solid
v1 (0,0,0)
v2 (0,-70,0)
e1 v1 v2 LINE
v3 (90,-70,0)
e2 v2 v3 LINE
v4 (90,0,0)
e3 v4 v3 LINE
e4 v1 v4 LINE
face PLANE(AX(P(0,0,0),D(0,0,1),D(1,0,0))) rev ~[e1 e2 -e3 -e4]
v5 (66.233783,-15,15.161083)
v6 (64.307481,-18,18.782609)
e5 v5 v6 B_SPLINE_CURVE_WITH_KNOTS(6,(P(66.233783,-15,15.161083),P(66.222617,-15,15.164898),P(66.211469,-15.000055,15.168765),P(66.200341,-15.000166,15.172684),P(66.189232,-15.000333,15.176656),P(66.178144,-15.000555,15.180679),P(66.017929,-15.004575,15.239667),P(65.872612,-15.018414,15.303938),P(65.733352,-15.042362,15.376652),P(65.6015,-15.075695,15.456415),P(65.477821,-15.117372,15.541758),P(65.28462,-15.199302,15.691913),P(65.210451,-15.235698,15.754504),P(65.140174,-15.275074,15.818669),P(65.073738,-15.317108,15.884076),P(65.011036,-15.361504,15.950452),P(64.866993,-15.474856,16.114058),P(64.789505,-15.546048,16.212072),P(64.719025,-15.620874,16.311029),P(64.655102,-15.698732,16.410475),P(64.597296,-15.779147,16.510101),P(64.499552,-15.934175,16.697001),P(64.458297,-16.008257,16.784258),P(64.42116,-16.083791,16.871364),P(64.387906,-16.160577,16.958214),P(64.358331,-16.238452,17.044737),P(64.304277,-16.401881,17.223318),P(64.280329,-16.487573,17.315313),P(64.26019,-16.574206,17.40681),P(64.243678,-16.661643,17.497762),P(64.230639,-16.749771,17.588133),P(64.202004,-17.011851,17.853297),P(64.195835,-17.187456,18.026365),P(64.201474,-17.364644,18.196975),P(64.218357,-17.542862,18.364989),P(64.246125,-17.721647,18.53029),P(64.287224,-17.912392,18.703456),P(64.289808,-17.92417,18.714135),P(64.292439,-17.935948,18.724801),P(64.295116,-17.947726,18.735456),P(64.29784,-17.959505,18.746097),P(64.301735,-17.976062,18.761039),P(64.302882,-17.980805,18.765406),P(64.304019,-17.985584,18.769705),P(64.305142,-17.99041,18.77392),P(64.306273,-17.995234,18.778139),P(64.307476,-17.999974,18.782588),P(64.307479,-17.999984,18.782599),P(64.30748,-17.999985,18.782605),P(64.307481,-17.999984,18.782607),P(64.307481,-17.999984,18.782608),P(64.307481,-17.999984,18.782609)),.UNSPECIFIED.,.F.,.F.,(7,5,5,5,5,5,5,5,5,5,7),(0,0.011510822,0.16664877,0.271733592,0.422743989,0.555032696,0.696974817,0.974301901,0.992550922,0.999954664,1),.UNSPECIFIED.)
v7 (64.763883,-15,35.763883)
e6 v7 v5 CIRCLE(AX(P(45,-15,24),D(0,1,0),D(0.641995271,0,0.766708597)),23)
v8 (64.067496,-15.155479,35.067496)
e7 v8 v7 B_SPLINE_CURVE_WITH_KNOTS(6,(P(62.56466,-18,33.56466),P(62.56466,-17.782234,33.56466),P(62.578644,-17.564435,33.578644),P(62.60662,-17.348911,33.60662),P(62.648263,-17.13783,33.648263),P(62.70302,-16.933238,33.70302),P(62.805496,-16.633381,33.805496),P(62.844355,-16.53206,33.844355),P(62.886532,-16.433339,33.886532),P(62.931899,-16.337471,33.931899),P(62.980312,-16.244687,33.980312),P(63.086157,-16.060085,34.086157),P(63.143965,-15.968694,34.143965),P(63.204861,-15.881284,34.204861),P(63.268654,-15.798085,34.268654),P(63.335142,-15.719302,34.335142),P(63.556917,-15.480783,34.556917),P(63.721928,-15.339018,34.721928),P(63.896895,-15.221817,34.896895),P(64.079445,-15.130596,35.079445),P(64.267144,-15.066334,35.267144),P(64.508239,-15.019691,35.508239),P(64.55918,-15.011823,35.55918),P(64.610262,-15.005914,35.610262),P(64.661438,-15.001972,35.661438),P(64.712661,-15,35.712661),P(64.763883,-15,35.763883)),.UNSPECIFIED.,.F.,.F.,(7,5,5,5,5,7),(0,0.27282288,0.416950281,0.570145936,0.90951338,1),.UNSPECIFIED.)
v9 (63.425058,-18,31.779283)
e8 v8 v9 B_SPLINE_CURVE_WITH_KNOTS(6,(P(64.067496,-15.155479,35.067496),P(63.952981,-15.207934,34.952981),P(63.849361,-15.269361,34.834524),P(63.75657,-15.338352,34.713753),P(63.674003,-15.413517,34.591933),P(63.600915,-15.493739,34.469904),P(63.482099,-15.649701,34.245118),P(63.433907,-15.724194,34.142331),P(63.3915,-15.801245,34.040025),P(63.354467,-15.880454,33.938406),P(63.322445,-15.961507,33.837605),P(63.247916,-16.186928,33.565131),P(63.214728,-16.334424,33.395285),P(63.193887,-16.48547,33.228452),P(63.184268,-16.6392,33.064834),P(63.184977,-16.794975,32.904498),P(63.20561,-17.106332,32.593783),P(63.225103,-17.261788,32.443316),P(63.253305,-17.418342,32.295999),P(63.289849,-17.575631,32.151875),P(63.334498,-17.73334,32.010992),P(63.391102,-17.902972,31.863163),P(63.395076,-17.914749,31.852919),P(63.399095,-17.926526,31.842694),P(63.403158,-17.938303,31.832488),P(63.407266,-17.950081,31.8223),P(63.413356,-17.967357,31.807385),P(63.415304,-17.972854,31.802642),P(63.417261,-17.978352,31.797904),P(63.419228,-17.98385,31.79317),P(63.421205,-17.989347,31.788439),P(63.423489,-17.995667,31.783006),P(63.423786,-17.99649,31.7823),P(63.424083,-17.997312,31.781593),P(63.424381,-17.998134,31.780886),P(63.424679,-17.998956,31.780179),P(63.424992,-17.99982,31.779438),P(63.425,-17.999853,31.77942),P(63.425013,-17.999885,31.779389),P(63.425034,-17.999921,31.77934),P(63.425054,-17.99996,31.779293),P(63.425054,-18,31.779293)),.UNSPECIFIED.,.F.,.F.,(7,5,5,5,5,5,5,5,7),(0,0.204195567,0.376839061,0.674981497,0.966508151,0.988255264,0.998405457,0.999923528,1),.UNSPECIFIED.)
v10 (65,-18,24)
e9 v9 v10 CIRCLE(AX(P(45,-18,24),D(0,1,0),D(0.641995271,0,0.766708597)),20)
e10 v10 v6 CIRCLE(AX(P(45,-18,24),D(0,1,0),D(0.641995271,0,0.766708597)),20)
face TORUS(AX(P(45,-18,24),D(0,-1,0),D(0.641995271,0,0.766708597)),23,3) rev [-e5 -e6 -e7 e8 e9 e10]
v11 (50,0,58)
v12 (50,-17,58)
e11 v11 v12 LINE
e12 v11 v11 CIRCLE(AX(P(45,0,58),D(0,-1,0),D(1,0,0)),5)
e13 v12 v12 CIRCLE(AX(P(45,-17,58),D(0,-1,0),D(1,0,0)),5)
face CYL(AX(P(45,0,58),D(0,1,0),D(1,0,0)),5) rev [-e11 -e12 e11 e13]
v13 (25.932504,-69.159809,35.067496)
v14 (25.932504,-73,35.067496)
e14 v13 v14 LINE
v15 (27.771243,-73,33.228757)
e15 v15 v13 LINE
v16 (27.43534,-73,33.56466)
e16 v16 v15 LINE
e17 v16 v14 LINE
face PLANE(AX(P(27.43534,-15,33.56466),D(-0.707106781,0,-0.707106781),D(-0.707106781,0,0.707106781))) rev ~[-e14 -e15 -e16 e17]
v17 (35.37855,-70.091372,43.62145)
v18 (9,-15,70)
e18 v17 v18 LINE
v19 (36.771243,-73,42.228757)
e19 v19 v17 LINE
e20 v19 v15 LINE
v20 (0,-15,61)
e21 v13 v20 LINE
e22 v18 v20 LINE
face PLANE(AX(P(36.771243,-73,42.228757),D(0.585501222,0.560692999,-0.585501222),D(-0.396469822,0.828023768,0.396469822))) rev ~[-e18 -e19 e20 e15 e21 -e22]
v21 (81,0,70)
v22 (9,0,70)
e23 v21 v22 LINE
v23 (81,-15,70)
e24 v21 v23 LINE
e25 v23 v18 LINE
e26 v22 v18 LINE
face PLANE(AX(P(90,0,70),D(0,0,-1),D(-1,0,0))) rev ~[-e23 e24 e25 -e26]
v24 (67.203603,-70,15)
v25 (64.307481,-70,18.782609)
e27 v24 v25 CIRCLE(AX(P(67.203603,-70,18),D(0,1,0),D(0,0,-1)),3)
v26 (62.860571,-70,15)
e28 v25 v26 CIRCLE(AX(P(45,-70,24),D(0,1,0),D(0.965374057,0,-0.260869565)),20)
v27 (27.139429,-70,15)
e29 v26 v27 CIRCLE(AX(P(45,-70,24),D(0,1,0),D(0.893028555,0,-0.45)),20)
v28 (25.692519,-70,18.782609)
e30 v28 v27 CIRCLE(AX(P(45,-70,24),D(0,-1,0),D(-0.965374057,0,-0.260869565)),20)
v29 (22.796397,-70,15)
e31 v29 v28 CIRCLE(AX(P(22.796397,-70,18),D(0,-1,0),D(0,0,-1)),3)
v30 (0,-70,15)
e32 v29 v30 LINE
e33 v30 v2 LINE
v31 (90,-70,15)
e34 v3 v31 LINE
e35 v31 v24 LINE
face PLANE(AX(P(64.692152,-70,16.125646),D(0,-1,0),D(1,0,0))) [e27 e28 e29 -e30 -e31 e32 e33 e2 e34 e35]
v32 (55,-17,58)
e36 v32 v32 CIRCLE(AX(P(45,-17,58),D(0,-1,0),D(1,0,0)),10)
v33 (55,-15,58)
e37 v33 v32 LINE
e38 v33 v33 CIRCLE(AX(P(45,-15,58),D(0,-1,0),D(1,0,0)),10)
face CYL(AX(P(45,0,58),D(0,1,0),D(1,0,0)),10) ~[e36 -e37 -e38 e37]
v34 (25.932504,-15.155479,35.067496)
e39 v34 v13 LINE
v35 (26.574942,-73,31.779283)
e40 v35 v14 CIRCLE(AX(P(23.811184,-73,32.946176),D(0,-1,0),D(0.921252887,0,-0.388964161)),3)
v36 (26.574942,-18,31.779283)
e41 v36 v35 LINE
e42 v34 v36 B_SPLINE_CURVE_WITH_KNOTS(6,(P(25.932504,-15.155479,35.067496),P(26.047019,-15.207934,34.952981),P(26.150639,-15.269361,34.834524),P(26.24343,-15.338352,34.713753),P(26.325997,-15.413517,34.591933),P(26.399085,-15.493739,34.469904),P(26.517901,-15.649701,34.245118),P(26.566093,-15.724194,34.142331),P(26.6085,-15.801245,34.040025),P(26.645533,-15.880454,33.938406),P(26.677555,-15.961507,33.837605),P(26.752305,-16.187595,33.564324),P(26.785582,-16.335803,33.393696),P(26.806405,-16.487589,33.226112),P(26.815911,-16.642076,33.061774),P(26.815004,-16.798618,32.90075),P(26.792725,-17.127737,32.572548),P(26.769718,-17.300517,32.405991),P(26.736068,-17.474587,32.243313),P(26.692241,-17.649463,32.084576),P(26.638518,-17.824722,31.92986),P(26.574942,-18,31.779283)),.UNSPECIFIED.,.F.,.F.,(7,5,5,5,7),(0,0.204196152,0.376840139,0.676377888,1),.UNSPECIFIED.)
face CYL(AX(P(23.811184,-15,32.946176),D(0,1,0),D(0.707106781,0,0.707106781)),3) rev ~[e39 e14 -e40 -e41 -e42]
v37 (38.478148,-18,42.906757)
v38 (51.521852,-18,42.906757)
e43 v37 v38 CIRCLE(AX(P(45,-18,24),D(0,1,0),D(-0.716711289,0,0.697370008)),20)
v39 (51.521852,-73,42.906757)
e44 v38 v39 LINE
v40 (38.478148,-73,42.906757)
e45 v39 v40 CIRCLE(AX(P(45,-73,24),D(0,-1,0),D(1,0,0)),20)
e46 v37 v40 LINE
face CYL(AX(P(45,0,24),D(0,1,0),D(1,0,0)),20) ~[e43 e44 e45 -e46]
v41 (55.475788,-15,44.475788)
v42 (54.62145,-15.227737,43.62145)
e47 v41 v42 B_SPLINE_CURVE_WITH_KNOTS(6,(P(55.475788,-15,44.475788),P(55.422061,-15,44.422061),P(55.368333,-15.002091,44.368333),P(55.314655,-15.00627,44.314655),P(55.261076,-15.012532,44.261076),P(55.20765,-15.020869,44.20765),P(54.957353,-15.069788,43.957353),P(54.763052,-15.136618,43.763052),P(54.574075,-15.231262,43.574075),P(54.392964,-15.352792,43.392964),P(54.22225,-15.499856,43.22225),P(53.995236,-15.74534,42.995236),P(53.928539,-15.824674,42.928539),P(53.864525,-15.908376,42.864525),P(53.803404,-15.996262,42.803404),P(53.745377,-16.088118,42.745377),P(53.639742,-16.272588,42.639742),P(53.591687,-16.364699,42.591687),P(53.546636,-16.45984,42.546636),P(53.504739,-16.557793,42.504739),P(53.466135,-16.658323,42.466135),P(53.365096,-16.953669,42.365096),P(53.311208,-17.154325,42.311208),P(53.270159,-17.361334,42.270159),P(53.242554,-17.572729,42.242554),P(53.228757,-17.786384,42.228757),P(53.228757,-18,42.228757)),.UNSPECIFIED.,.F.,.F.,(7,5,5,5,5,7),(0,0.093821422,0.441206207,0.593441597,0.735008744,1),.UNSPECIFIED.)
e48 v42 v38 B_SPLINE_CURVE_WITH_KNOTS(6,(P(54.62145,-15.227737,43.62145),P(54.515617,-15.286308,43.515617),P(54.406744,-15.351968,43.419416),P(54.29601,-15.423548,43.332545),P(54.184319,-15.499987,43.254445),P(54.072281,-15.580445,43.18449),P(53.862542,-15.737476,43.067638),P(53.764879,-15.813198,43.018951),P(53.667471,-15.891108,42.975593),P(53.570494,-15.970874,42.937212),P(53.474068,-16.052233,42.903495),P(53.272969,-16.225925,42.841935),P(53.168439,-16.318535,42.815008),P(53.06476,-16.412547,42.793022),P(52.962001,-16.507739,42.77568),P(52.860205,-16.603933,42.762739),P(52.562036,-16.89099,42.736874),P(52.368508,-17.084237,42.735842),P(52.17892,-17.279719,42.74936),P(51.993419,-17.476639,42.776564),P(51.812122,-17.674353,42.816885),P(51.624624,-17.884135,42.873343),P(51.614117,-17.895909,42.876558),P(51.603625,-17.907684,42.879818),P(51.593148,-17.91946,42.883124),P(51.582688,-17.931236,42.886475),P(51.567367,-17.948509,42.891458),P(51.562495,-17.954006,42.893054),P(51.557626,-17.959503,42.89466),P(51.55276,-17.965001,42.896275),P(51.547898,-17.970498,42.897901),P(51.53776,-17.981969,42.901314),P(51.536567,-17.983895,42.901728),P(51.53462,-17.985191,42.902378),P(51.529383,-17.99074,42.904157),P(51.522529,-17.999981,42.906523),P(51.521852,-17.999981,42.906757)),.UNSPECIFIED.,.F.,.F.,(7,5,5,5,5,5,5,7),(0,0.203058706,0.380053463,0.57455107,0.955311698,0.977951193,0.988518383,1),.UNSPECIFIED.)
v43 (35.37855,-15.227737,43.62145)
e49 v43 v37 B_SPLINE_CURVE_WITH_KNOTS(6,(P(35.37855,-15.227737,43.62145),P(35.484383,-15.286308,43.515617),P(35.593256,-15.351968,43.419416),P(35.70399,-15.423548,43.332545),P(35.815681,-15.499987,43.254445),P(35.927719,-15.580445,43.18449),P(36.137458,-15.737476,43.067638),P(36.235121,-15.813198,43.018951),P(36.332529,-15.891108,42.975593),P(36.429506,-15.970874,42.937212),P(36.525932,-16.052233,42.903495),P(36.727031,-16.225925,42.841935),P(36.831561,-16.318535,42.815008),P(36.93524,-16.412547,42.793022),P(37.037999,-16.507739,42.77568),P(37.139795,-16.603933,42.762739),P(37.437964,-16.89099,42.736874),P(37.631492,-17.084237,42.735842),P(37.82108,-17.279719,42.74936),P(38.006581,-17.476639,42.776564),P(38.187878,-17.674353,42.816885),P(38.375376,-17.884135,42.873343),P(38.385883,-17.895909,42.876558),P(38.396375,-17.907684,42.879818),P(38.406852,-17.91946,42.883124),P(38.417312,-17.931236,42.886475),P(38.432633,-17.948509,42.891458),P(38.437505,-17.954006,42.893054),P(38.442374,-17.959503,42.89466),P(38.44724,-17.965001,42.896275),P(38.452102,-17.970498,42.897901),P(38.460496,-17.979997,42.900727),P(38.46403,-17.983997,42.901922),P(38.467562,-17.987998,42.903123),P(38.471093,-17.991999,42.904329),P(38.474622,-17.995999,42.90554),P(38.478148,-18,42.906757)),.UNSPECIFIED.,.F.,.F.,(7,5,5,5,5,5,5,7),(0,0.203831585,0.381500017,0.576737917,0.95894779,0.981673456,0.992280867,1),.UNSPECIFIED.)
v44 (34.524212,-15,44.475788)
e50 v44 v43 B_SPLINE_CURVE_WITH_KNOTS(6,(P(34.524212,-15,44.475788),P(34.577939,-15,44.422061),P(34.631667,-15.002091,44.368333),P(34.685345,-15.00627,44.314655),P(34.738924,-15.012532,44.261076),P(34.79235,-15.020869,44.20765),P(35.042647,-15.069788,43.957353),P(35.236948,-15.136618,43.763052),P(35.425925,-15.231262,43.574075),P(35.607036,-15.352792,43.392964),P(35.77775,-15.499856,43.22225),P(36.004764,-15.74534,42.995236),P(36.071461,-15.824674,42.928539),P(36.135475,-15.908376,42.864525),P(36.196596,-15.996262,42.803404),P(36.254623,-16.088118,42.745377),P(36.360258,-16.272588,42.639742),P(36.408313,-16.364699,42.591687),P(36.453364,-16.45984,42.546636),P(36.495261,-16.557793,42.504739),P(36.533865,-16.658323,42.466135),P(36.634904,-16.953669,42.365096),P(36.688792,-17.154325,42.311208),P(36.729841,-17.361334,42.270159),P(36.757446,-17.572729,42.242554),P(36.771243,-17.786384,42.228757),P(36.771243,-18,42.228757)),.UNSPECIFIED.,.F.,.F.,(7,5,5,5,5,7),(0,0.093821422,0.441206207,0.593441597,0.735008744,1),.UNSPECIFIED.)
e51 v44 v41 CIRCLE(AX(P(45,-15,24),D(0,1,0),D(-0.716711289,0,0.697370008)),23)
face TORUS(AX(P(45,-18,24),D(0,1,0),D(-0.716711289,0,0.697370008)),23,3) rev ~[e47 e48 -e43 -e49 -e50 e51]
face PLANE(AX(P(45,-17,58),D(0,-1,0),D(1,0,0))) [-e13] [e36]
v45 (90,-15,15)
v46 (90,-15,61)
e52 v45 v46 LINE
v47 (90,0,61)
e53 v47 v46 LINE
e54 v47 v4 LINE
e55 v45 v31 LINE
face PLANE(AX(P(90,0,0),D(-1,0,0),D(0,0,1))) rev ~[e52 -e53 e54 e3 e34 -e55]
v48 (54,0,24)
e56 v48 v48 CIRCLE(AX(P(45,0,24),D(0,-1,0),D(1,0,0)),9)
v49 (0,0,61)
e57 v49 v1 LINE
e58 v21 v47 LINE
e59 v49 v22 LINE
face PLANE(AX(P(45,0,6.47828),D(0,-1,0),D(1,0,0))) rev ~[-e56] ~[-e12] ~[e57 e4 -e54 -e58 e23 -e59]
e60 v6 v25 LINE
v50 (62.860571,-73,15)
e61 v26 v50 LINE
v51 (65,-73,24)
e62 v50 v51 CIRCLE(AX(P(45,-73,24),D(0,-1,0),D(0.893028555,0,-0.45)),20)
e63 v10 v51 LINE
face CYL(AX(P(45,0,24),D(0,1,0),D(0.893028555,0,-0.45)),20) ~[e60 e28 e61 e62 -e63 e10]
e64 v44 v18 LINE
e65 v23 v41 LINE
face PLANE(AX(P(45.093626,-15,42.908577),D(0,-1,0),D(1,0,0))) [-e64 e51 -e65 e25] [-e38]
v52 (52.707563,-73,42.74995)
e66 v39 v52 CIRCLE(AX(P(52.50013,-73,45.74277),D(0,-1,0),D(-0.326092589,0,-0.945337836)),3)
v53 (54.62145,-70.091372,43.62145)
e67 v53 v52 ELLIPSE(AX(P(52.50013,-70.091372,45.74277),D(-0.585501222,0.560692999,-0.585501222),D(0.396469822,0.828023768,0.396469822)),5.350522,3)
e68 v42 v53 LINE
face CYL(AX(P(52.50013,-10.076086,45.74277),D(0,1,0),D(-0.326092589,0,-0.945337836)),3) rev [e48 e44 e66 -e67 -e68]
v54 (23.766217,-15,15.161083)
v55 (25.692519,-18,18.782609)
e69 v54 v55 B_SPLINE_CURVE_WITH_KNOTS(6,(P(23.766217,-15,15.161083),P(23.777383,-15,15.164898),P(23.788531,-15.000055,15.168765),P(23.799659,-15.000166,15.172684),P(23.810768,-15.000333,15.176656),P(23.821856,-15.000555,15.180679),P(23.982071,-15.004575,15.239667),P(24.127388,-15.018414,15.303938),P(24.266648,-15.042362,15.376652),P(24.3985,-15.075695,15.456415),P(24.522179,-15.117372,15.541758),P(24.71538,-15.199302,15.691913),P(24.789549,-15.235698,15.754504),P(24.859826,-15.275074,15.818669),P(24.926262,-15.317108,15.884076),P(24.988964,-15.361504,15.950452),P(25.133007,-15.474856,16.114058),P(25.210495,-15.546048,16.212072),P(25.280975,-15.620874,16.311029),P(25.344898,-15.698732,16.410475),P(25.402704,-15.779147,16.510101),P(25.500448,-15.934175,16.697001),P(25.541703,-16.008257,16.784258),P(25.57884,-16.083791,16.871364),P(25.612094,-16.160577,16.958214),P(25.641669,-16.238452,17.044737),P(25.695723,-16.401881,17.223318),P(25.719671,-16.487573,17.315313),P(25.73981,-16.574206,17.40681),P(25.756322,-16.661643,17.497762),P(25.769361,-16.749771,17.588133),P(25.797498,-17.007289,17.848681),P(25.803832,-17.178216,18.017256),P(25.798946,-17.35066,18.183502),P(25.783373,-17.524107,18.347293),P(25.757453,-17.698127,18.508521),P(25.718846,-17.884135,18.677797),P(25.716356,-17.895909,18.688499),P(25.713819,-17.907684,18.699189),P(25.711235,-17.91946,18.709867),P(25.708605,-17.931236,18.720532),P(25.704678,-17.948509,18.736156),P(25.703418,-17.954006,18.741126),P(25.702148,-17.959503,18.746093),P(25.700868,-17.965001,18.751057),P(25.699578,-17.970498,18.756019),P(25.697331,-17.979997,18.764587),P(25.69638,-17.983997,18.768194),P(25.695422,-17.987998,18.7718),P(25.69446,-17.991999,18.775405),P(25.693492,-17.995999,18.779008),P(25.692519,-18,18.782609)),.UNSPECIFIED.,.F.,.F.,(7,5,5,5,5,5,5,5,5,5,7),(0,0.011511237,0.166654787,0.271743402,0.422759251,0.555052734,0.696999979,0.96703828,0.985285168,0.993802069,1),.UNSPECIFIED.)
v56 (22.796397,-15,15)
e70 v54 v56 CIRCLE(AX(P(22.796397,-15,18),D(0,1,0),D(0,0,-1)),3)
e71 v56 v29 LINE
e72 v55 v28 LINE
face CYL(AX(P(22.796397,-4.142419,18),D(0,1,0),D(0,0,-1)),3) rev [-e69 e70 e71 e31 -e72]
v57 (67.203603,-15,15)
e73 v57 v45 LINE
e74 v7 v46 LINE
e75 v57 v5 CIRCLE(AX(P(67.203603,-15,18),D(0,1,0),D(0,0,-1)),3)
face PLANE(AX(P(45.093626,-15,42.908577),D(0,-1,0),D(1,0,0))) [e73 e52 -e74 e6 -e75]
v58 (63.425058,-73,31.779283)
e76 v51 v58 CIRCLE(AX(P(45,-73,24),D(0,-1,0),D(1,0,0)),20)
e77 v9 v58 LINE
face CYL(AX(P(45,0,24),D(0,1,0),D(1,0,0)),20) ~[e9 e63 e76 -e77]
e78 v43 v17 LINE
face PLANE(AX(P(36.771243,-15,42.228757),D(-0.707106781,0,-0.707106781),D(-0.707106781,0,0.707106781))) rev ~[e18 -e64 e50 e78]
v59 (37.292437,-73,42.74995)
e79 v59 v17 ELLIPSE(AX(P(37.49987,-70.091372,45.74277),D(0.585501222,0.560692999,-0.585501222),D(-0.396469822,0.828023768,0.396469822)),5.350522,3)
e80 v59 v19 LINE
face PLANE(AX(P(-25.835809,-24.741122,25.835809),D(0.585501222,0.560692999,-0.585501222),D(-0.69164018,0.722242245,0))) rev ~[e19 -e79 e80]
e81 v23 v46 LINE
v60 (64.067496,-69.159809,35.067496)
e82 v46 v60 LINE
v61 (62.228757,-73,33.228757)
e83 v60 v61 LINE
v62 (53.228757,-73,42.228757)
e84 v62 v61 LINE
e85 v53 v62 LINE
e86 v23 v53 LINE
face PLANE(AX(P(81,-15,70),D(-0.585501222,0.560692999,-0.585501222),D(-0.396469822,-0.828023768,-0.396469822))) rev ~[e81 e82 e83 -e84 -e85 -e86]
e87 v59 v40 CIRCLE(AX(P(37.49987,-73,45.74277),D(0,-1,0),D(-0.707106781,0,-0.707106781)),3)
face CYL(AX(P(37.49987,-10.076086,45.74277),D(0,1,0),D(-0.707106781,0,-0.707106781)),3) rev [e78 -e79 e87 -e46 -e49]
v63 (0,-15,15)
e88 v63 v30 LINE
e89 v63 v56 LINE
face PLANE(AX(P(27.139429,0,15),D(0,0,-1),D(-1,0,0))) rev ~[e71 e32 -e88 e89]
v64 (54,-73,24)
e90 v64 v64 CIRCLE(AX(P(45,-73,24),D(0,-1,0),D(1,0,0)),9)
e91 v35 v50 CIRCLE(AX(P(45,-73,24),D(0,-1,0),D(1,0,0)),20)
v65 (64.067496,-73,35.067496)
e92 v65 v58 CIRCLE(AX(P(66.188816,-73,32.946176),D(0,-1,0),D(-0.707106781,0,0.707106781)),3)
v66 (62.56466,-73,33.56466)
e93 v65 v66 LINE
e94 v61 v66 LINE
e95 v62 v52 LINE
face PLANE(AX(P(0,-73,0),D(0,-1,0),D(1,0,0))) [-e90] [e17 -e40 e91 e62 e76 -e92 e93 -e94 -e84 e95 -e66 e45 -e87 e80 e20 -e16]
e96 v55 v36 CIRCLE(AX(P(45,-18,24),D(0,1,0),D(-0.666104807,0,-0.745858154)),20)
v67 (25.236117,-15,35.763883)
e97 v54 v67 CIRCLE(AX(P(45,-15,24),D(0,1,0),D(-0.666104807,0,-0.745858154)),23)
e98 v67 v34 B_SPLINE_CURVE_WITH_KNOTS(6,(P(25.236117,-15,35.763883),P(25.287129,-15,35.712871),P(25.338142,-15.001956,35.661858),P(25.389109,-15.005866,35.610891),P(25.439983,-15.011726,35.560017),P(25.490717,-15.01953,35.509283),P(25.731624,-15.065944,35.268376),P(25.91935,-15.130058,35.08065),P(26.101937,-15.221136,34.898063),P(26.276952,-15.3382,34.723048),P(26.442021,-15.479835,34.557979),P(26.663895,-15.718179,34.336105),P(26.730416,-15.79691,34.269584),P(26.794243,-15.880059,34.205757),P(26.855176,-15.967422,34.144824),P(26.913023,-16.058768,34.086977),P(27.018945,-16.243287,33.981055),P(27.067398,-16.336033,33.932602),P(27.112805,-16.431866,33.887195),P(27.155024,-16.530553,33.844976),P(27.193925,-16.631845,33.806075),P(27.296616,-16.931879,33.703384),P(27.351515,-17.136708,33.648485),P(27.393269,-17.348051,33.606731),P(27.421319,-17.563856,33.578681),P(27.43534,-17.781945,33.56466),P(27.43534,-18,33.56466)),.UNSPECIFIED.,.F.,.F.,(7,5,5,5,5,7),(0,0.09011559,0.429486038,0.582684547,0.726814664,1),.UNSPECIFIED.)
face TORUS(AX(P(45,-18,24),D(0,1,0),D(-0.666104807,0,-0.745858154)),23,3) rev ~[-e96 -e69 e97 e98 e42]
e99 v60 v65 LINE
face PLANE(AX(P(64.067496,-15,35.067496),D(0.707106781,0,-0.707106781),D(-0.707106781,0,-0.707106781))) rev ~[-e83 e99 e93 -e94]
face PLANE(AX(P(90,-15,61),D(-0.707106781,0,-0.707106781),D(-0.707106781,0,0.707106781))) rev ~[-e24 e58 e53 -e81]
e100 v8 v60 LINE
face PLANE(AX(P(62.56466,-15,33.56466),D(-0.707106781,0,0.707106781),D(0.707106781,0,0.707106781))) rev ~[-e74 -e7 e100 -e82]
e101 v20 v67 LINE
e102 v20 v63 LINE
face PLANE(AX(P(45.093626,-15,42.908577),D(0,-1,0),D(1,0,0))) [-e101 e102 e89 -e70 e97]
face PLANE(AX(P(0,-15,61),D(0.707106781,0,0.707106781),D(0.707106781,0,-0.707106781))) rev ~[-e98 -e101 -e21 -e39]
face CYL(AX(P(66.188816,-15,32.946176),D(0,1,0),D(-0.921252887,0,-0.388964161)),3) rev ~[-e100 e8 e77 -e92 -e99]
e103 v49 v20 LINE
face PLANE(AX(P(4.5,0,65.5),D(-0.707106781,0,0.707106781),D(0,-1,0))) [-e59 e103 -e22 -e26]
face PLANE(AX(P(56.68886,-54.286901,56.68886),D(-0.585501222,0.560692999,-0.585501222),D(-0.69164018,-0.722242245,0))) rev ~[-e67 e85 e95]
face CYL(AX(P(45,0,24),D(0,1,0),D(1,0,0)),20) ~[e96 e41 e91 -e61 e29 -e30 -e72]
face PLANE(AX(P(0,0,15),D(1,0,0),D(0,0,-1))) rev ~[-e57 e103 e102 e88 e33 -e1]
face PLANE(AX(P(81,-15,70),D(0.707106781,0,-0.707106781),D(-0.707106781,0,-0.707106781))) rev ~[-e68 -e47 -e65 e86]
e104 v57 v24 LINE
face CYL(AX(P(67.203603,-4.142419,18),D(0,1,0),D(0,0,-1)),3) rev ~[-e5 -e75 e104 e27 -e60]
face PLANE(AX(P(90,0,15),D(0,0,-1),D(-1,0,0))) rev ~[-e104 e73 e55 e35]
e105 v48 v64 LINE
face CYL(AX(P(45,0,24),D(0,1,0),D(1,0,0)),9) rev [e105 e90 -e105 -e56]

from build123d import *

# Parameters (mm, degrees)
F0_R          = 10
F1_DEPTH      = 15
F2_DEPTH      = 70
F0_R_2        = 9
F3_DEPTH      = 73
F0_R_3        = 5
F4_DEPTH      = 17
F5_SIZE2      = 9
F5_SIZE       = 9
F7_DEPTH      = 58
F9_DEPTH      = 12.7279220614
F11_DEPTH     = 12.7279220614
F12_T1_DEPTH  = 65.8575805292
F12_T6_DEPTH  = 62.9239144665
F12_T11_DEPTH = 62.9239144665
F12_T14_ANGLE = 91.5672431693
F12_T16_ANGLE = 98.292097676
F12_T18_ANGLE = 98.292097676
F12_T22_DEPTH = 67.925124519
F12_T28_DEPTH = 62.6117965858
F12_T35_DEPTH = 62.6117965858
F12_T42_DEPTH = 67.925124519
F12_T48_DEPTH = 62.6117965858
F12_T55_DEPTH = 62.6117965858


# Not quite as in the source:
# - a fillet or chamfer that OpenCascade refuses, or shapes differently, is made with other operations: its cross-section is extruded or revolved along the edge and cut away or added


with BuildPart() as f1:
    # F0 (on Front) → F1 (new body)
    with BuildSketch(Plane.XZ):
        with BuildLine():
            Line((0, 70), (0, 15))
            Line((0, 15), (27.1394289005, 15))
            ThreePointArc((27.1394289005, 15), (40.3746039083, 43.4577930659), (65, 24))
            ThreePointArc((65, 24), (64.4577930659, 19.3746039083), (62.8605710995, 15))
            Line((62.8605710995, 15), (90, 15))
            Line((90, 15), (90, 70))
            Line((90, 70), (0, 70))
        make_face()
        with Locations((45, 58)):
            Circle(F0_R, mode=Mode.SUBTRACT)
    extrude(amount=F1_DEPTH)

    # F0 (on Front) → F2 (join)
    with BuildSketch(Plane.XZ):
        with BuildLine():
            Line((0, 15), (0, 0))
            Line((0, 0), (90, 0))
            Line((90, 0), (90, 15))
            Line((90, 15), (62.8605710995, 15))
            ThreePointArc((62.8605710995, 15), (45, 4), (27.1394289005, 15))
            Line((27.1394289005, 15), (0, 15))
        make_face()
    extrude(amount=F2_DEPTH)

    # F0 (on Front) → F3 (join)
    with BuildSketch(Plane.XZ):
        with BuildLine():
            ThreePointArc((65, 24), (40.3746039083, 43.4577930659), (27.1394289005, 15))
            ThreePointArc((27.1394289005, 15), (45, 4), (62.8605710995, 15))
            ThreePointArc((62.8605710995, 15), (64.4577930659, 19.3746039083), (65, 24))
        make_face()
        with Locations((45, 24)):
            Circle(F0_R_2, mode=Mode.SUBTRACT)
    extrude(amount=F3_DEPTH)

    # F0 (on Front) → F4 (join)
    with BuildSketch(Plane.XZ):
        with Locations((45, 58)):
            Circle(F0_R)
        with Locations((45, 58)):
            Circle(F0_R_3, mode=Mode.SUBTRACT)
    extrude(amount=F4_DEPTH)

    # F5
    f5_edges = [f1.edges().sort_by_distance(p)[0] for p in [
        (90, -7.5, 70),
        (0, -7.5, 70),
    ]]
    chamfer(f5_edges, length=F5_SIZE, length2=F5_SIZE2)

    # F6 (on face) → F7 (join, through all)
    with BuildSketch(Plane.XZ.offset(15)):
        with BuildLine():
            Line((90, 61), (81, 70))
            Line((81, 70), (53.2287565553, 42.2287565553))
            ThreePointArc((53.2287565553, 42.2287565553), (58.60484202, 38.659750121), (62.5646599663, 33.5646599663))
            Line((62.5646599663, 33.5646599663), (90, 61))
        make_face()
        with BuildLine():
            Line((36.7712434447, 42.2287565553), (9, 70))
            Line((9, 70), (0, 61))
            Line((0, 61), (27.4353400337, 33.5646599663))
            ThreePointArc((27.4353400337, 33.5646599663), (31.39515798, 38.659750121), (36.7712434447, 42.2287565553))
        make_face()
    extrude(amount=F7_DEPTH)

    # F8 (on face) → F9 (cut, through all)
    with BuildSketch(Plane(origin=(5.5, 0, -5.5), x_dir=(0, -1, 0), z_dir=(-0.7071067812, 0, 0.7071067812))):
        Polygon((73, 67.4986548357), (73, 106.7731239592), (15, 106.7731239592), align=None)
    extrude(amount=-F9_DEPTH, mode=Mode.SUBTRACT)

    # F10 (on face) → F11 (cut, through all)
    with BuildSketch(Plane(origin=(39.5, 0, 39.5), x_dir=(0, 1, 0), z_dir=(0.7071067812, 0, 0.7071067812))):
        Polygon((-73, 3.859044529), (-15, 43.1335136524), (-73, 43.1335136524), align=None)
    extrude(amount=-F11_DEPTH, mode=Mode.SUBTRACT)

    # F12: fillet of radius 3 on 9 edges, made by hand

    # F12_s2 → F12_t1 (join)
    with BuildSketch(Plane.XZ.offset(4.1424194708)):
        with BuildLine():
            ThreePointArc((67.2036033112, 15), (64.821605611, 16.1762437234), (64.3074811402, 18.7826086957))
            ThreePointArc((64.3074811402, 18.7826086957), (63.6800176381, 16.8545860133), (62.8605710995, 15))
            Line((62.8605710995, 15), (67.2036033112, 15))
        make_face()
        with BuildLine():
            ThreePointArc((22.7963966888, 15), (25.178394389, 16.1762437234), (25.6925188598, 18.7826086957))
            ThreePointArc((25.6925188598, 18.7826086957), (26.3199823619, 16.8545860133), (27.1394289005, 15))
            Line((27.1394289005, 15), (22.7963966888, 15))
        make_face()
    extrude(amount=F12_T1_DEPTH)


with BuildPart() as f12_tool4:
    # F12_s5 → F12_t6 (new body)
    with BuildSketch(Plane.XZ.offset(10.0760855335)):
        with BuildLine():
            ThreePointArc((35.378550121, 43.621449879), (36.8258280598, 42.8194729683), (38.47814823, 42.9067567153))
            ThreePointArc((38.47814823, 42.9067567153), (37.6169090114, 42.5873604219), (36.7712434447, 42.2287565553))
            Line((36.7712434447, 42.2287565553), (35.378550121, 43.621449879))
        make_face()
    extrude(amount=F12_T6_DEPTH)

    split(bisect_by=Plane(origin=(-25.8358090511, -24.7411221638, 25.8358090511), x_dir=(-0.6916401802, 0.7222422455, 0), z_dir=(0.5855012217, 0.5606929988, -0.5855012217)), keep=Keep.TOP)


with BuildPart() as f1_1:
    add(f1.part)

    # F12_t3: union F12_tool4
    add(f12_tool4.part)


with BuildPart() as f12_tool9:
    # F12_s10 → F12_t11 (new body)
    with BuildSketch(Plane.XZ.offset(10.0760855335)):
        with BuildLine():
            ThreePointArc((51.52185177, 42.9067567153), (53.1741719402, 42.8194729683), (54.621449879, 43.621449879))
            Line((54.621449879, 43.621449879), (53.2287565553, 42.2287565553))
            ThreePointArc((53.2287565553, 42.2287565553), (52.3830909886, 42.5873604219), (51.52185177, 42.9067567153))
        make_face()
    extrude(amount=F12_T11_DEPTH)

    split(bisect_by=Plane(origin=(56.6888603025, -54.2869013815, 56.6888603025), x_dir=(-0.6916401802, -0.7222422455, 0), z_dir=(-0.5855012217, 0.5606929988, -0.5855012217)), keep=Keep.TOP)


with BuildPart() as f1_2:
    add(f1_1.part)

    # F12_t8: union F12_tool9
    add(f12_tool9.part)

    # F12_s13 → F12_t14 (revolve)
    with BuildSketch(Plane(origin=(33.8801327713, 0, 34.8197847954), x_dir=(0, 1, 0), z_dir=(-0.6973700085, 0, -0.7167112886))):
        with BuildLine():
            ThreePointArc((-15, -7.4848722144), (-15.8786796564, -5.3635518709), (-18, -4.4848722144))
            Line((-18, -4.4848722144), (-15, -4.4848722144))
            Line((-15, -4.4848722144), (-15, -7.4848722144))
        make_face()
    revolve(axis=Axis((45, -15, 24), (0, 1, 0)), revolution_arc=F12_T14_ANGLE)

    # F12_s15 → F12_t16 (revolve)
    with BuildSketch(Plane(origin=(14.639534214, 0, -12.2582579265), x_dir=(0, 1, 0), z_dir=(-0.7667085967, 0, 0.6419952708))):
        with BuildLine():
            ThreePointArc((-18, -67.2907935079), (-15.8786796564, -68.1694731643), (-15, -70.2907935079))
            Line((-15, -70.2907935079), (-15, -67.2907935079))
            Line((-15, -67.2907935079), (-18, -67.2907935079))
        make_face()
    revolve(axis=Axis((45, -15, 24), (0, 1, 0)), revolution_arc=F12_T16_ANGLE)

    # F12_s17 → F12_t18 (revolve)
    with BuildSketch(Plane(origin=(13.1100245291, 0, -11.708191847), x_dir=(0, 1, 0), z_dir=(0.7458581541, 0, -0.666104807))):
        with BuildLine():
            ThreePointArc((-15, 24.8753120149), (-15.8786796564, 26.9966323584), (-18, 27.8753120149))
            Line((-18, 27.8753120149), (-15, 27.8753120149))
            Line((-15, 27.8753120149), (-15, 24.8753120149))
        make_face()
    revolve(axis=Axis((45, -15, 24), (0, 1, 0)), revolution_arc=F12_T18_ANGLE)


with BuildPart() as f12_tool20:
    # F12_s21 → F12_t22 (new body)
    with BuildSketch(Plane.XZ.offset(9.6866720668)):
        with BuildLine():
            ThreePointArc((25.9325039488, 35.0674960512), (26.7555146188, 33.5214277242), (26.5749422655, 31.779283224))
            ThreePointArc((26.5749422655, 31.779283224), (26.9830125278, 32.6826356843), (27.4353400337, 33.5646599663))
            Line((27.4353400337, 33.5646599663), (25.9325039488, 35.0674960512))
        make_face()
    extrude(amount=F12_T22_DEPTH)

    split(bisect_by=Plane.XZ.offset(15), keep=Keep.BOTTOM)

    split(bisect_by=Plane(origin=(30.5, 0, 30.5), x_dir=(0, 1, 0), z_dir=(-0.7071067812, 0, -0.7071067812)), keep=Keep.TOP)


with BuildPart() as f1_3:
    add(f1_2.part)

    # F12_t19: union F12_tool20
    add(f12_tool20.part)


with BuildPart() as f12_tool26:
    # F12_s27 → F12_t28 (new body)
    with BuildSketch(Plane.XZ.offset(15)):
        with BuildLine():
            ThreePointArc((25.9325039488, 35.0674960512), (26.7555146188, 33.5214277242), (26.5749422655, 31.779283224))
            ThreePointArc((26.5749422655, 31.779283224), (26.9830125278, 32.6826356843), (27.4353400337, 33.5646599663))
            Line((27.4353400337, 33.5646599663), (25.9325039488, 35.0674960512))
        make_face()
    extrude(amount=F12_T28_DEPTH)

    split(bisect_by=Plane(origin=(-25.8358090511, -24.7411221638, 25.8358090511), x_dir=(-0.6916401802, 0.7222422455, 0), z_dir=(0.5855012217, 0.5606929988, -0.5855012217)), keep=Keep.TOP)

    split(bisect_by=Plane(origin=(30.5, 0, 30.5), x_dir=(0, 1, 0), z_dir=(-0.7071067812, 0, -0.7071067812)), keep=Keep.TOP)

    split(bisect_by=Plane.XZ.offset(73), keep=Keep.BOTTOM)


with BuildPart() as f1_4:
    add(f1_3.part)

    # F12_t25: union F12_tool26
    add(f12_tool26.part)


with BuildPart() as f12_tool33:
    # F12_s34 → F12_t35 (new body)
    with BuildSketch(Plane.XZ.offset(15)):
        with BuildLine():
            ThreePointArc((25.9325039488, 35.0674960512), (26.7555146188, 33.5214277242), (26.5749422655, 31.779283224))
            ThreePointArc((26.5749422655, 31.779283224), (26.9830125278, 32.6826356843), (27.4353400337, 33.5646599663))
            Line((27.4353400337, 33.5646599663), (25.9325039488, 35.0674960512))
        make_face()
    extrude(amount=F12_T35_DEPTH)

    split(bisect_by=Plane(origin=(-25.8358090511, -24.7411221638, 25.8358090511), x_dir=(0.6916401802, -0.7222422455, 0), z_dir=(-0.5855012217, -0.5606929988, 0.5855012217)), keep=Keep.TOP)

    split(bisect_by=Plane(origin=(30.5, 0, 30.5), x_dir=(0, 1, 0), z_dir=(-0.7071067812, 0, -0.7071067812)), keep=Keep.TOP)

    split(bisect_by=Plane.XZ.offset(73), keep=Keep.BOTTOM)


with BuildPart() as f1_5:
    add(f1_4.part)

    # F12_t32: union F12_tool33
    add(f12_tool33.part)


with BuildPart() as f12_tool40:
    # F12_s41 → F12_t42 (new body)
    with BuildSketch(Plane.XZ.offset(9.6866720668)):
        with BuildLine():
            ThreePointArc((63.4250577345, 31.779283224), (63.2444853812, 33.5214277242), (64.0674960512, 35.0674960512))
            Line((64.0674960512, 35.0674960512), (62.5646599663, 33.5646599663))
            ThreePointArc((62.5646599663, 33.5646599663), (63.0169874722, 32.6826356843), (63.4250577345, 31.779283224))
        make_face()
    extrude(amount=F12_T42_DEPTH)

    split(bisect_by=Plane(origin=(14.5, 0, -14.5), x_dir=(0, 1, 0), z_dir=(0.7071067812, 0, -0.7071067812)), keep=Keep.TOP)

    split(bisect_by=Plane.XZ.offset(15), keep=Keep.BOTTOM)


with BuildPart() as f1_6:
    add(f1_5.part)

    # F12_t39: union F12_tool40
    add(f12_tool40.part)


with BuildPart() as f12_tool46:
    # F12_s47 → F12_t48 (new body)
    with BuildSketch(Plane.XZ.offset(15)):
        with BuildLine():
            ThreePointArc((63.4250577345, 31.779283224), (63.2444853812, 33.5214277242), (64.0674960512, 35.0674960512))
            Line((64.0674960512, 35.0674960512), (62.5646599663, 33.5646599663))
            ThreePointArc((62.5646599663, 33.5646599663), (63.0169874722, 32.6826356843), (63.4250577345, 31.779283224))
        make_face()
    extrude(amount=F12_T48_DEPTH)

    split(bisect_by=Plane.XZ.offset(73), keep=Keep.BOTTOM)

    split(bisect_by=Plane(origin=(14.5, 0, -14.5), x_dir=(0, 1, 0), z_dir=(0.7071067812, 0, -0.7071067812)), keep=Keep.TOP)

    split(bisect_by=Plane(origin=(56.6888603025, -54.2869013815, 56.6888603025), x_dir=(-0.6916401802, -0.7222422455, 0), z_dir=(-0.5855012217, 0.5606929988, -0.5855012217)), keep=Keep.TOP)


with BuildPart() as f1_7:
    add(f1_6.part)

    # F12_t45: union F12_tool46
    add(f12_tool46.part)


with BuildPart() as f12_tool53:
    # F12_s54 → F12_t55 (new body)
    with BuildSketch(Plane.XZ.offset(15)):
        with BuildLine():
            ThreePointArc((63.4250577345, 31.779283224), (63.2444853812, 33.5214277242), (64.0674960512, 35.0674960512))
            Line((64.0674960512, 35.0674960512), (62.5646599663, 33.5646599663))
            ThreePointArc((62.5646599663, 33.5646599663), (63.0169874722, 32.6826356843), (63.4250577345, 31.779283224))
        make_face()
    extrude(amount=F12_T55_DEPTH)

    split(bisect_by=Plane.XZ.offset(73), keep=Keep.BOTTOM)

    split(bisect_by=Plane(origin=(14.5, 0, -14.5), x_dir=(0, 1, 0), z_dir=(0.7071067812, 0, -0.7071067812)), keep=Keep.TOP)

    split(bisect_by=Plane(origin=(56.6888603025, -54.2869013815, 56.6888603025), x_dir=(0.6916401802, 0.7222422455, 0), z_dir=(0.5855012217, -0.5606929988, 0.5855012217)), keep=Keep.TOP)


with BuildPart() as f1_8:
    add(f1_7.part)

    # F12_t52: union F12_tool53
    add(f12_tool53.part)


solid = f1_8.part
